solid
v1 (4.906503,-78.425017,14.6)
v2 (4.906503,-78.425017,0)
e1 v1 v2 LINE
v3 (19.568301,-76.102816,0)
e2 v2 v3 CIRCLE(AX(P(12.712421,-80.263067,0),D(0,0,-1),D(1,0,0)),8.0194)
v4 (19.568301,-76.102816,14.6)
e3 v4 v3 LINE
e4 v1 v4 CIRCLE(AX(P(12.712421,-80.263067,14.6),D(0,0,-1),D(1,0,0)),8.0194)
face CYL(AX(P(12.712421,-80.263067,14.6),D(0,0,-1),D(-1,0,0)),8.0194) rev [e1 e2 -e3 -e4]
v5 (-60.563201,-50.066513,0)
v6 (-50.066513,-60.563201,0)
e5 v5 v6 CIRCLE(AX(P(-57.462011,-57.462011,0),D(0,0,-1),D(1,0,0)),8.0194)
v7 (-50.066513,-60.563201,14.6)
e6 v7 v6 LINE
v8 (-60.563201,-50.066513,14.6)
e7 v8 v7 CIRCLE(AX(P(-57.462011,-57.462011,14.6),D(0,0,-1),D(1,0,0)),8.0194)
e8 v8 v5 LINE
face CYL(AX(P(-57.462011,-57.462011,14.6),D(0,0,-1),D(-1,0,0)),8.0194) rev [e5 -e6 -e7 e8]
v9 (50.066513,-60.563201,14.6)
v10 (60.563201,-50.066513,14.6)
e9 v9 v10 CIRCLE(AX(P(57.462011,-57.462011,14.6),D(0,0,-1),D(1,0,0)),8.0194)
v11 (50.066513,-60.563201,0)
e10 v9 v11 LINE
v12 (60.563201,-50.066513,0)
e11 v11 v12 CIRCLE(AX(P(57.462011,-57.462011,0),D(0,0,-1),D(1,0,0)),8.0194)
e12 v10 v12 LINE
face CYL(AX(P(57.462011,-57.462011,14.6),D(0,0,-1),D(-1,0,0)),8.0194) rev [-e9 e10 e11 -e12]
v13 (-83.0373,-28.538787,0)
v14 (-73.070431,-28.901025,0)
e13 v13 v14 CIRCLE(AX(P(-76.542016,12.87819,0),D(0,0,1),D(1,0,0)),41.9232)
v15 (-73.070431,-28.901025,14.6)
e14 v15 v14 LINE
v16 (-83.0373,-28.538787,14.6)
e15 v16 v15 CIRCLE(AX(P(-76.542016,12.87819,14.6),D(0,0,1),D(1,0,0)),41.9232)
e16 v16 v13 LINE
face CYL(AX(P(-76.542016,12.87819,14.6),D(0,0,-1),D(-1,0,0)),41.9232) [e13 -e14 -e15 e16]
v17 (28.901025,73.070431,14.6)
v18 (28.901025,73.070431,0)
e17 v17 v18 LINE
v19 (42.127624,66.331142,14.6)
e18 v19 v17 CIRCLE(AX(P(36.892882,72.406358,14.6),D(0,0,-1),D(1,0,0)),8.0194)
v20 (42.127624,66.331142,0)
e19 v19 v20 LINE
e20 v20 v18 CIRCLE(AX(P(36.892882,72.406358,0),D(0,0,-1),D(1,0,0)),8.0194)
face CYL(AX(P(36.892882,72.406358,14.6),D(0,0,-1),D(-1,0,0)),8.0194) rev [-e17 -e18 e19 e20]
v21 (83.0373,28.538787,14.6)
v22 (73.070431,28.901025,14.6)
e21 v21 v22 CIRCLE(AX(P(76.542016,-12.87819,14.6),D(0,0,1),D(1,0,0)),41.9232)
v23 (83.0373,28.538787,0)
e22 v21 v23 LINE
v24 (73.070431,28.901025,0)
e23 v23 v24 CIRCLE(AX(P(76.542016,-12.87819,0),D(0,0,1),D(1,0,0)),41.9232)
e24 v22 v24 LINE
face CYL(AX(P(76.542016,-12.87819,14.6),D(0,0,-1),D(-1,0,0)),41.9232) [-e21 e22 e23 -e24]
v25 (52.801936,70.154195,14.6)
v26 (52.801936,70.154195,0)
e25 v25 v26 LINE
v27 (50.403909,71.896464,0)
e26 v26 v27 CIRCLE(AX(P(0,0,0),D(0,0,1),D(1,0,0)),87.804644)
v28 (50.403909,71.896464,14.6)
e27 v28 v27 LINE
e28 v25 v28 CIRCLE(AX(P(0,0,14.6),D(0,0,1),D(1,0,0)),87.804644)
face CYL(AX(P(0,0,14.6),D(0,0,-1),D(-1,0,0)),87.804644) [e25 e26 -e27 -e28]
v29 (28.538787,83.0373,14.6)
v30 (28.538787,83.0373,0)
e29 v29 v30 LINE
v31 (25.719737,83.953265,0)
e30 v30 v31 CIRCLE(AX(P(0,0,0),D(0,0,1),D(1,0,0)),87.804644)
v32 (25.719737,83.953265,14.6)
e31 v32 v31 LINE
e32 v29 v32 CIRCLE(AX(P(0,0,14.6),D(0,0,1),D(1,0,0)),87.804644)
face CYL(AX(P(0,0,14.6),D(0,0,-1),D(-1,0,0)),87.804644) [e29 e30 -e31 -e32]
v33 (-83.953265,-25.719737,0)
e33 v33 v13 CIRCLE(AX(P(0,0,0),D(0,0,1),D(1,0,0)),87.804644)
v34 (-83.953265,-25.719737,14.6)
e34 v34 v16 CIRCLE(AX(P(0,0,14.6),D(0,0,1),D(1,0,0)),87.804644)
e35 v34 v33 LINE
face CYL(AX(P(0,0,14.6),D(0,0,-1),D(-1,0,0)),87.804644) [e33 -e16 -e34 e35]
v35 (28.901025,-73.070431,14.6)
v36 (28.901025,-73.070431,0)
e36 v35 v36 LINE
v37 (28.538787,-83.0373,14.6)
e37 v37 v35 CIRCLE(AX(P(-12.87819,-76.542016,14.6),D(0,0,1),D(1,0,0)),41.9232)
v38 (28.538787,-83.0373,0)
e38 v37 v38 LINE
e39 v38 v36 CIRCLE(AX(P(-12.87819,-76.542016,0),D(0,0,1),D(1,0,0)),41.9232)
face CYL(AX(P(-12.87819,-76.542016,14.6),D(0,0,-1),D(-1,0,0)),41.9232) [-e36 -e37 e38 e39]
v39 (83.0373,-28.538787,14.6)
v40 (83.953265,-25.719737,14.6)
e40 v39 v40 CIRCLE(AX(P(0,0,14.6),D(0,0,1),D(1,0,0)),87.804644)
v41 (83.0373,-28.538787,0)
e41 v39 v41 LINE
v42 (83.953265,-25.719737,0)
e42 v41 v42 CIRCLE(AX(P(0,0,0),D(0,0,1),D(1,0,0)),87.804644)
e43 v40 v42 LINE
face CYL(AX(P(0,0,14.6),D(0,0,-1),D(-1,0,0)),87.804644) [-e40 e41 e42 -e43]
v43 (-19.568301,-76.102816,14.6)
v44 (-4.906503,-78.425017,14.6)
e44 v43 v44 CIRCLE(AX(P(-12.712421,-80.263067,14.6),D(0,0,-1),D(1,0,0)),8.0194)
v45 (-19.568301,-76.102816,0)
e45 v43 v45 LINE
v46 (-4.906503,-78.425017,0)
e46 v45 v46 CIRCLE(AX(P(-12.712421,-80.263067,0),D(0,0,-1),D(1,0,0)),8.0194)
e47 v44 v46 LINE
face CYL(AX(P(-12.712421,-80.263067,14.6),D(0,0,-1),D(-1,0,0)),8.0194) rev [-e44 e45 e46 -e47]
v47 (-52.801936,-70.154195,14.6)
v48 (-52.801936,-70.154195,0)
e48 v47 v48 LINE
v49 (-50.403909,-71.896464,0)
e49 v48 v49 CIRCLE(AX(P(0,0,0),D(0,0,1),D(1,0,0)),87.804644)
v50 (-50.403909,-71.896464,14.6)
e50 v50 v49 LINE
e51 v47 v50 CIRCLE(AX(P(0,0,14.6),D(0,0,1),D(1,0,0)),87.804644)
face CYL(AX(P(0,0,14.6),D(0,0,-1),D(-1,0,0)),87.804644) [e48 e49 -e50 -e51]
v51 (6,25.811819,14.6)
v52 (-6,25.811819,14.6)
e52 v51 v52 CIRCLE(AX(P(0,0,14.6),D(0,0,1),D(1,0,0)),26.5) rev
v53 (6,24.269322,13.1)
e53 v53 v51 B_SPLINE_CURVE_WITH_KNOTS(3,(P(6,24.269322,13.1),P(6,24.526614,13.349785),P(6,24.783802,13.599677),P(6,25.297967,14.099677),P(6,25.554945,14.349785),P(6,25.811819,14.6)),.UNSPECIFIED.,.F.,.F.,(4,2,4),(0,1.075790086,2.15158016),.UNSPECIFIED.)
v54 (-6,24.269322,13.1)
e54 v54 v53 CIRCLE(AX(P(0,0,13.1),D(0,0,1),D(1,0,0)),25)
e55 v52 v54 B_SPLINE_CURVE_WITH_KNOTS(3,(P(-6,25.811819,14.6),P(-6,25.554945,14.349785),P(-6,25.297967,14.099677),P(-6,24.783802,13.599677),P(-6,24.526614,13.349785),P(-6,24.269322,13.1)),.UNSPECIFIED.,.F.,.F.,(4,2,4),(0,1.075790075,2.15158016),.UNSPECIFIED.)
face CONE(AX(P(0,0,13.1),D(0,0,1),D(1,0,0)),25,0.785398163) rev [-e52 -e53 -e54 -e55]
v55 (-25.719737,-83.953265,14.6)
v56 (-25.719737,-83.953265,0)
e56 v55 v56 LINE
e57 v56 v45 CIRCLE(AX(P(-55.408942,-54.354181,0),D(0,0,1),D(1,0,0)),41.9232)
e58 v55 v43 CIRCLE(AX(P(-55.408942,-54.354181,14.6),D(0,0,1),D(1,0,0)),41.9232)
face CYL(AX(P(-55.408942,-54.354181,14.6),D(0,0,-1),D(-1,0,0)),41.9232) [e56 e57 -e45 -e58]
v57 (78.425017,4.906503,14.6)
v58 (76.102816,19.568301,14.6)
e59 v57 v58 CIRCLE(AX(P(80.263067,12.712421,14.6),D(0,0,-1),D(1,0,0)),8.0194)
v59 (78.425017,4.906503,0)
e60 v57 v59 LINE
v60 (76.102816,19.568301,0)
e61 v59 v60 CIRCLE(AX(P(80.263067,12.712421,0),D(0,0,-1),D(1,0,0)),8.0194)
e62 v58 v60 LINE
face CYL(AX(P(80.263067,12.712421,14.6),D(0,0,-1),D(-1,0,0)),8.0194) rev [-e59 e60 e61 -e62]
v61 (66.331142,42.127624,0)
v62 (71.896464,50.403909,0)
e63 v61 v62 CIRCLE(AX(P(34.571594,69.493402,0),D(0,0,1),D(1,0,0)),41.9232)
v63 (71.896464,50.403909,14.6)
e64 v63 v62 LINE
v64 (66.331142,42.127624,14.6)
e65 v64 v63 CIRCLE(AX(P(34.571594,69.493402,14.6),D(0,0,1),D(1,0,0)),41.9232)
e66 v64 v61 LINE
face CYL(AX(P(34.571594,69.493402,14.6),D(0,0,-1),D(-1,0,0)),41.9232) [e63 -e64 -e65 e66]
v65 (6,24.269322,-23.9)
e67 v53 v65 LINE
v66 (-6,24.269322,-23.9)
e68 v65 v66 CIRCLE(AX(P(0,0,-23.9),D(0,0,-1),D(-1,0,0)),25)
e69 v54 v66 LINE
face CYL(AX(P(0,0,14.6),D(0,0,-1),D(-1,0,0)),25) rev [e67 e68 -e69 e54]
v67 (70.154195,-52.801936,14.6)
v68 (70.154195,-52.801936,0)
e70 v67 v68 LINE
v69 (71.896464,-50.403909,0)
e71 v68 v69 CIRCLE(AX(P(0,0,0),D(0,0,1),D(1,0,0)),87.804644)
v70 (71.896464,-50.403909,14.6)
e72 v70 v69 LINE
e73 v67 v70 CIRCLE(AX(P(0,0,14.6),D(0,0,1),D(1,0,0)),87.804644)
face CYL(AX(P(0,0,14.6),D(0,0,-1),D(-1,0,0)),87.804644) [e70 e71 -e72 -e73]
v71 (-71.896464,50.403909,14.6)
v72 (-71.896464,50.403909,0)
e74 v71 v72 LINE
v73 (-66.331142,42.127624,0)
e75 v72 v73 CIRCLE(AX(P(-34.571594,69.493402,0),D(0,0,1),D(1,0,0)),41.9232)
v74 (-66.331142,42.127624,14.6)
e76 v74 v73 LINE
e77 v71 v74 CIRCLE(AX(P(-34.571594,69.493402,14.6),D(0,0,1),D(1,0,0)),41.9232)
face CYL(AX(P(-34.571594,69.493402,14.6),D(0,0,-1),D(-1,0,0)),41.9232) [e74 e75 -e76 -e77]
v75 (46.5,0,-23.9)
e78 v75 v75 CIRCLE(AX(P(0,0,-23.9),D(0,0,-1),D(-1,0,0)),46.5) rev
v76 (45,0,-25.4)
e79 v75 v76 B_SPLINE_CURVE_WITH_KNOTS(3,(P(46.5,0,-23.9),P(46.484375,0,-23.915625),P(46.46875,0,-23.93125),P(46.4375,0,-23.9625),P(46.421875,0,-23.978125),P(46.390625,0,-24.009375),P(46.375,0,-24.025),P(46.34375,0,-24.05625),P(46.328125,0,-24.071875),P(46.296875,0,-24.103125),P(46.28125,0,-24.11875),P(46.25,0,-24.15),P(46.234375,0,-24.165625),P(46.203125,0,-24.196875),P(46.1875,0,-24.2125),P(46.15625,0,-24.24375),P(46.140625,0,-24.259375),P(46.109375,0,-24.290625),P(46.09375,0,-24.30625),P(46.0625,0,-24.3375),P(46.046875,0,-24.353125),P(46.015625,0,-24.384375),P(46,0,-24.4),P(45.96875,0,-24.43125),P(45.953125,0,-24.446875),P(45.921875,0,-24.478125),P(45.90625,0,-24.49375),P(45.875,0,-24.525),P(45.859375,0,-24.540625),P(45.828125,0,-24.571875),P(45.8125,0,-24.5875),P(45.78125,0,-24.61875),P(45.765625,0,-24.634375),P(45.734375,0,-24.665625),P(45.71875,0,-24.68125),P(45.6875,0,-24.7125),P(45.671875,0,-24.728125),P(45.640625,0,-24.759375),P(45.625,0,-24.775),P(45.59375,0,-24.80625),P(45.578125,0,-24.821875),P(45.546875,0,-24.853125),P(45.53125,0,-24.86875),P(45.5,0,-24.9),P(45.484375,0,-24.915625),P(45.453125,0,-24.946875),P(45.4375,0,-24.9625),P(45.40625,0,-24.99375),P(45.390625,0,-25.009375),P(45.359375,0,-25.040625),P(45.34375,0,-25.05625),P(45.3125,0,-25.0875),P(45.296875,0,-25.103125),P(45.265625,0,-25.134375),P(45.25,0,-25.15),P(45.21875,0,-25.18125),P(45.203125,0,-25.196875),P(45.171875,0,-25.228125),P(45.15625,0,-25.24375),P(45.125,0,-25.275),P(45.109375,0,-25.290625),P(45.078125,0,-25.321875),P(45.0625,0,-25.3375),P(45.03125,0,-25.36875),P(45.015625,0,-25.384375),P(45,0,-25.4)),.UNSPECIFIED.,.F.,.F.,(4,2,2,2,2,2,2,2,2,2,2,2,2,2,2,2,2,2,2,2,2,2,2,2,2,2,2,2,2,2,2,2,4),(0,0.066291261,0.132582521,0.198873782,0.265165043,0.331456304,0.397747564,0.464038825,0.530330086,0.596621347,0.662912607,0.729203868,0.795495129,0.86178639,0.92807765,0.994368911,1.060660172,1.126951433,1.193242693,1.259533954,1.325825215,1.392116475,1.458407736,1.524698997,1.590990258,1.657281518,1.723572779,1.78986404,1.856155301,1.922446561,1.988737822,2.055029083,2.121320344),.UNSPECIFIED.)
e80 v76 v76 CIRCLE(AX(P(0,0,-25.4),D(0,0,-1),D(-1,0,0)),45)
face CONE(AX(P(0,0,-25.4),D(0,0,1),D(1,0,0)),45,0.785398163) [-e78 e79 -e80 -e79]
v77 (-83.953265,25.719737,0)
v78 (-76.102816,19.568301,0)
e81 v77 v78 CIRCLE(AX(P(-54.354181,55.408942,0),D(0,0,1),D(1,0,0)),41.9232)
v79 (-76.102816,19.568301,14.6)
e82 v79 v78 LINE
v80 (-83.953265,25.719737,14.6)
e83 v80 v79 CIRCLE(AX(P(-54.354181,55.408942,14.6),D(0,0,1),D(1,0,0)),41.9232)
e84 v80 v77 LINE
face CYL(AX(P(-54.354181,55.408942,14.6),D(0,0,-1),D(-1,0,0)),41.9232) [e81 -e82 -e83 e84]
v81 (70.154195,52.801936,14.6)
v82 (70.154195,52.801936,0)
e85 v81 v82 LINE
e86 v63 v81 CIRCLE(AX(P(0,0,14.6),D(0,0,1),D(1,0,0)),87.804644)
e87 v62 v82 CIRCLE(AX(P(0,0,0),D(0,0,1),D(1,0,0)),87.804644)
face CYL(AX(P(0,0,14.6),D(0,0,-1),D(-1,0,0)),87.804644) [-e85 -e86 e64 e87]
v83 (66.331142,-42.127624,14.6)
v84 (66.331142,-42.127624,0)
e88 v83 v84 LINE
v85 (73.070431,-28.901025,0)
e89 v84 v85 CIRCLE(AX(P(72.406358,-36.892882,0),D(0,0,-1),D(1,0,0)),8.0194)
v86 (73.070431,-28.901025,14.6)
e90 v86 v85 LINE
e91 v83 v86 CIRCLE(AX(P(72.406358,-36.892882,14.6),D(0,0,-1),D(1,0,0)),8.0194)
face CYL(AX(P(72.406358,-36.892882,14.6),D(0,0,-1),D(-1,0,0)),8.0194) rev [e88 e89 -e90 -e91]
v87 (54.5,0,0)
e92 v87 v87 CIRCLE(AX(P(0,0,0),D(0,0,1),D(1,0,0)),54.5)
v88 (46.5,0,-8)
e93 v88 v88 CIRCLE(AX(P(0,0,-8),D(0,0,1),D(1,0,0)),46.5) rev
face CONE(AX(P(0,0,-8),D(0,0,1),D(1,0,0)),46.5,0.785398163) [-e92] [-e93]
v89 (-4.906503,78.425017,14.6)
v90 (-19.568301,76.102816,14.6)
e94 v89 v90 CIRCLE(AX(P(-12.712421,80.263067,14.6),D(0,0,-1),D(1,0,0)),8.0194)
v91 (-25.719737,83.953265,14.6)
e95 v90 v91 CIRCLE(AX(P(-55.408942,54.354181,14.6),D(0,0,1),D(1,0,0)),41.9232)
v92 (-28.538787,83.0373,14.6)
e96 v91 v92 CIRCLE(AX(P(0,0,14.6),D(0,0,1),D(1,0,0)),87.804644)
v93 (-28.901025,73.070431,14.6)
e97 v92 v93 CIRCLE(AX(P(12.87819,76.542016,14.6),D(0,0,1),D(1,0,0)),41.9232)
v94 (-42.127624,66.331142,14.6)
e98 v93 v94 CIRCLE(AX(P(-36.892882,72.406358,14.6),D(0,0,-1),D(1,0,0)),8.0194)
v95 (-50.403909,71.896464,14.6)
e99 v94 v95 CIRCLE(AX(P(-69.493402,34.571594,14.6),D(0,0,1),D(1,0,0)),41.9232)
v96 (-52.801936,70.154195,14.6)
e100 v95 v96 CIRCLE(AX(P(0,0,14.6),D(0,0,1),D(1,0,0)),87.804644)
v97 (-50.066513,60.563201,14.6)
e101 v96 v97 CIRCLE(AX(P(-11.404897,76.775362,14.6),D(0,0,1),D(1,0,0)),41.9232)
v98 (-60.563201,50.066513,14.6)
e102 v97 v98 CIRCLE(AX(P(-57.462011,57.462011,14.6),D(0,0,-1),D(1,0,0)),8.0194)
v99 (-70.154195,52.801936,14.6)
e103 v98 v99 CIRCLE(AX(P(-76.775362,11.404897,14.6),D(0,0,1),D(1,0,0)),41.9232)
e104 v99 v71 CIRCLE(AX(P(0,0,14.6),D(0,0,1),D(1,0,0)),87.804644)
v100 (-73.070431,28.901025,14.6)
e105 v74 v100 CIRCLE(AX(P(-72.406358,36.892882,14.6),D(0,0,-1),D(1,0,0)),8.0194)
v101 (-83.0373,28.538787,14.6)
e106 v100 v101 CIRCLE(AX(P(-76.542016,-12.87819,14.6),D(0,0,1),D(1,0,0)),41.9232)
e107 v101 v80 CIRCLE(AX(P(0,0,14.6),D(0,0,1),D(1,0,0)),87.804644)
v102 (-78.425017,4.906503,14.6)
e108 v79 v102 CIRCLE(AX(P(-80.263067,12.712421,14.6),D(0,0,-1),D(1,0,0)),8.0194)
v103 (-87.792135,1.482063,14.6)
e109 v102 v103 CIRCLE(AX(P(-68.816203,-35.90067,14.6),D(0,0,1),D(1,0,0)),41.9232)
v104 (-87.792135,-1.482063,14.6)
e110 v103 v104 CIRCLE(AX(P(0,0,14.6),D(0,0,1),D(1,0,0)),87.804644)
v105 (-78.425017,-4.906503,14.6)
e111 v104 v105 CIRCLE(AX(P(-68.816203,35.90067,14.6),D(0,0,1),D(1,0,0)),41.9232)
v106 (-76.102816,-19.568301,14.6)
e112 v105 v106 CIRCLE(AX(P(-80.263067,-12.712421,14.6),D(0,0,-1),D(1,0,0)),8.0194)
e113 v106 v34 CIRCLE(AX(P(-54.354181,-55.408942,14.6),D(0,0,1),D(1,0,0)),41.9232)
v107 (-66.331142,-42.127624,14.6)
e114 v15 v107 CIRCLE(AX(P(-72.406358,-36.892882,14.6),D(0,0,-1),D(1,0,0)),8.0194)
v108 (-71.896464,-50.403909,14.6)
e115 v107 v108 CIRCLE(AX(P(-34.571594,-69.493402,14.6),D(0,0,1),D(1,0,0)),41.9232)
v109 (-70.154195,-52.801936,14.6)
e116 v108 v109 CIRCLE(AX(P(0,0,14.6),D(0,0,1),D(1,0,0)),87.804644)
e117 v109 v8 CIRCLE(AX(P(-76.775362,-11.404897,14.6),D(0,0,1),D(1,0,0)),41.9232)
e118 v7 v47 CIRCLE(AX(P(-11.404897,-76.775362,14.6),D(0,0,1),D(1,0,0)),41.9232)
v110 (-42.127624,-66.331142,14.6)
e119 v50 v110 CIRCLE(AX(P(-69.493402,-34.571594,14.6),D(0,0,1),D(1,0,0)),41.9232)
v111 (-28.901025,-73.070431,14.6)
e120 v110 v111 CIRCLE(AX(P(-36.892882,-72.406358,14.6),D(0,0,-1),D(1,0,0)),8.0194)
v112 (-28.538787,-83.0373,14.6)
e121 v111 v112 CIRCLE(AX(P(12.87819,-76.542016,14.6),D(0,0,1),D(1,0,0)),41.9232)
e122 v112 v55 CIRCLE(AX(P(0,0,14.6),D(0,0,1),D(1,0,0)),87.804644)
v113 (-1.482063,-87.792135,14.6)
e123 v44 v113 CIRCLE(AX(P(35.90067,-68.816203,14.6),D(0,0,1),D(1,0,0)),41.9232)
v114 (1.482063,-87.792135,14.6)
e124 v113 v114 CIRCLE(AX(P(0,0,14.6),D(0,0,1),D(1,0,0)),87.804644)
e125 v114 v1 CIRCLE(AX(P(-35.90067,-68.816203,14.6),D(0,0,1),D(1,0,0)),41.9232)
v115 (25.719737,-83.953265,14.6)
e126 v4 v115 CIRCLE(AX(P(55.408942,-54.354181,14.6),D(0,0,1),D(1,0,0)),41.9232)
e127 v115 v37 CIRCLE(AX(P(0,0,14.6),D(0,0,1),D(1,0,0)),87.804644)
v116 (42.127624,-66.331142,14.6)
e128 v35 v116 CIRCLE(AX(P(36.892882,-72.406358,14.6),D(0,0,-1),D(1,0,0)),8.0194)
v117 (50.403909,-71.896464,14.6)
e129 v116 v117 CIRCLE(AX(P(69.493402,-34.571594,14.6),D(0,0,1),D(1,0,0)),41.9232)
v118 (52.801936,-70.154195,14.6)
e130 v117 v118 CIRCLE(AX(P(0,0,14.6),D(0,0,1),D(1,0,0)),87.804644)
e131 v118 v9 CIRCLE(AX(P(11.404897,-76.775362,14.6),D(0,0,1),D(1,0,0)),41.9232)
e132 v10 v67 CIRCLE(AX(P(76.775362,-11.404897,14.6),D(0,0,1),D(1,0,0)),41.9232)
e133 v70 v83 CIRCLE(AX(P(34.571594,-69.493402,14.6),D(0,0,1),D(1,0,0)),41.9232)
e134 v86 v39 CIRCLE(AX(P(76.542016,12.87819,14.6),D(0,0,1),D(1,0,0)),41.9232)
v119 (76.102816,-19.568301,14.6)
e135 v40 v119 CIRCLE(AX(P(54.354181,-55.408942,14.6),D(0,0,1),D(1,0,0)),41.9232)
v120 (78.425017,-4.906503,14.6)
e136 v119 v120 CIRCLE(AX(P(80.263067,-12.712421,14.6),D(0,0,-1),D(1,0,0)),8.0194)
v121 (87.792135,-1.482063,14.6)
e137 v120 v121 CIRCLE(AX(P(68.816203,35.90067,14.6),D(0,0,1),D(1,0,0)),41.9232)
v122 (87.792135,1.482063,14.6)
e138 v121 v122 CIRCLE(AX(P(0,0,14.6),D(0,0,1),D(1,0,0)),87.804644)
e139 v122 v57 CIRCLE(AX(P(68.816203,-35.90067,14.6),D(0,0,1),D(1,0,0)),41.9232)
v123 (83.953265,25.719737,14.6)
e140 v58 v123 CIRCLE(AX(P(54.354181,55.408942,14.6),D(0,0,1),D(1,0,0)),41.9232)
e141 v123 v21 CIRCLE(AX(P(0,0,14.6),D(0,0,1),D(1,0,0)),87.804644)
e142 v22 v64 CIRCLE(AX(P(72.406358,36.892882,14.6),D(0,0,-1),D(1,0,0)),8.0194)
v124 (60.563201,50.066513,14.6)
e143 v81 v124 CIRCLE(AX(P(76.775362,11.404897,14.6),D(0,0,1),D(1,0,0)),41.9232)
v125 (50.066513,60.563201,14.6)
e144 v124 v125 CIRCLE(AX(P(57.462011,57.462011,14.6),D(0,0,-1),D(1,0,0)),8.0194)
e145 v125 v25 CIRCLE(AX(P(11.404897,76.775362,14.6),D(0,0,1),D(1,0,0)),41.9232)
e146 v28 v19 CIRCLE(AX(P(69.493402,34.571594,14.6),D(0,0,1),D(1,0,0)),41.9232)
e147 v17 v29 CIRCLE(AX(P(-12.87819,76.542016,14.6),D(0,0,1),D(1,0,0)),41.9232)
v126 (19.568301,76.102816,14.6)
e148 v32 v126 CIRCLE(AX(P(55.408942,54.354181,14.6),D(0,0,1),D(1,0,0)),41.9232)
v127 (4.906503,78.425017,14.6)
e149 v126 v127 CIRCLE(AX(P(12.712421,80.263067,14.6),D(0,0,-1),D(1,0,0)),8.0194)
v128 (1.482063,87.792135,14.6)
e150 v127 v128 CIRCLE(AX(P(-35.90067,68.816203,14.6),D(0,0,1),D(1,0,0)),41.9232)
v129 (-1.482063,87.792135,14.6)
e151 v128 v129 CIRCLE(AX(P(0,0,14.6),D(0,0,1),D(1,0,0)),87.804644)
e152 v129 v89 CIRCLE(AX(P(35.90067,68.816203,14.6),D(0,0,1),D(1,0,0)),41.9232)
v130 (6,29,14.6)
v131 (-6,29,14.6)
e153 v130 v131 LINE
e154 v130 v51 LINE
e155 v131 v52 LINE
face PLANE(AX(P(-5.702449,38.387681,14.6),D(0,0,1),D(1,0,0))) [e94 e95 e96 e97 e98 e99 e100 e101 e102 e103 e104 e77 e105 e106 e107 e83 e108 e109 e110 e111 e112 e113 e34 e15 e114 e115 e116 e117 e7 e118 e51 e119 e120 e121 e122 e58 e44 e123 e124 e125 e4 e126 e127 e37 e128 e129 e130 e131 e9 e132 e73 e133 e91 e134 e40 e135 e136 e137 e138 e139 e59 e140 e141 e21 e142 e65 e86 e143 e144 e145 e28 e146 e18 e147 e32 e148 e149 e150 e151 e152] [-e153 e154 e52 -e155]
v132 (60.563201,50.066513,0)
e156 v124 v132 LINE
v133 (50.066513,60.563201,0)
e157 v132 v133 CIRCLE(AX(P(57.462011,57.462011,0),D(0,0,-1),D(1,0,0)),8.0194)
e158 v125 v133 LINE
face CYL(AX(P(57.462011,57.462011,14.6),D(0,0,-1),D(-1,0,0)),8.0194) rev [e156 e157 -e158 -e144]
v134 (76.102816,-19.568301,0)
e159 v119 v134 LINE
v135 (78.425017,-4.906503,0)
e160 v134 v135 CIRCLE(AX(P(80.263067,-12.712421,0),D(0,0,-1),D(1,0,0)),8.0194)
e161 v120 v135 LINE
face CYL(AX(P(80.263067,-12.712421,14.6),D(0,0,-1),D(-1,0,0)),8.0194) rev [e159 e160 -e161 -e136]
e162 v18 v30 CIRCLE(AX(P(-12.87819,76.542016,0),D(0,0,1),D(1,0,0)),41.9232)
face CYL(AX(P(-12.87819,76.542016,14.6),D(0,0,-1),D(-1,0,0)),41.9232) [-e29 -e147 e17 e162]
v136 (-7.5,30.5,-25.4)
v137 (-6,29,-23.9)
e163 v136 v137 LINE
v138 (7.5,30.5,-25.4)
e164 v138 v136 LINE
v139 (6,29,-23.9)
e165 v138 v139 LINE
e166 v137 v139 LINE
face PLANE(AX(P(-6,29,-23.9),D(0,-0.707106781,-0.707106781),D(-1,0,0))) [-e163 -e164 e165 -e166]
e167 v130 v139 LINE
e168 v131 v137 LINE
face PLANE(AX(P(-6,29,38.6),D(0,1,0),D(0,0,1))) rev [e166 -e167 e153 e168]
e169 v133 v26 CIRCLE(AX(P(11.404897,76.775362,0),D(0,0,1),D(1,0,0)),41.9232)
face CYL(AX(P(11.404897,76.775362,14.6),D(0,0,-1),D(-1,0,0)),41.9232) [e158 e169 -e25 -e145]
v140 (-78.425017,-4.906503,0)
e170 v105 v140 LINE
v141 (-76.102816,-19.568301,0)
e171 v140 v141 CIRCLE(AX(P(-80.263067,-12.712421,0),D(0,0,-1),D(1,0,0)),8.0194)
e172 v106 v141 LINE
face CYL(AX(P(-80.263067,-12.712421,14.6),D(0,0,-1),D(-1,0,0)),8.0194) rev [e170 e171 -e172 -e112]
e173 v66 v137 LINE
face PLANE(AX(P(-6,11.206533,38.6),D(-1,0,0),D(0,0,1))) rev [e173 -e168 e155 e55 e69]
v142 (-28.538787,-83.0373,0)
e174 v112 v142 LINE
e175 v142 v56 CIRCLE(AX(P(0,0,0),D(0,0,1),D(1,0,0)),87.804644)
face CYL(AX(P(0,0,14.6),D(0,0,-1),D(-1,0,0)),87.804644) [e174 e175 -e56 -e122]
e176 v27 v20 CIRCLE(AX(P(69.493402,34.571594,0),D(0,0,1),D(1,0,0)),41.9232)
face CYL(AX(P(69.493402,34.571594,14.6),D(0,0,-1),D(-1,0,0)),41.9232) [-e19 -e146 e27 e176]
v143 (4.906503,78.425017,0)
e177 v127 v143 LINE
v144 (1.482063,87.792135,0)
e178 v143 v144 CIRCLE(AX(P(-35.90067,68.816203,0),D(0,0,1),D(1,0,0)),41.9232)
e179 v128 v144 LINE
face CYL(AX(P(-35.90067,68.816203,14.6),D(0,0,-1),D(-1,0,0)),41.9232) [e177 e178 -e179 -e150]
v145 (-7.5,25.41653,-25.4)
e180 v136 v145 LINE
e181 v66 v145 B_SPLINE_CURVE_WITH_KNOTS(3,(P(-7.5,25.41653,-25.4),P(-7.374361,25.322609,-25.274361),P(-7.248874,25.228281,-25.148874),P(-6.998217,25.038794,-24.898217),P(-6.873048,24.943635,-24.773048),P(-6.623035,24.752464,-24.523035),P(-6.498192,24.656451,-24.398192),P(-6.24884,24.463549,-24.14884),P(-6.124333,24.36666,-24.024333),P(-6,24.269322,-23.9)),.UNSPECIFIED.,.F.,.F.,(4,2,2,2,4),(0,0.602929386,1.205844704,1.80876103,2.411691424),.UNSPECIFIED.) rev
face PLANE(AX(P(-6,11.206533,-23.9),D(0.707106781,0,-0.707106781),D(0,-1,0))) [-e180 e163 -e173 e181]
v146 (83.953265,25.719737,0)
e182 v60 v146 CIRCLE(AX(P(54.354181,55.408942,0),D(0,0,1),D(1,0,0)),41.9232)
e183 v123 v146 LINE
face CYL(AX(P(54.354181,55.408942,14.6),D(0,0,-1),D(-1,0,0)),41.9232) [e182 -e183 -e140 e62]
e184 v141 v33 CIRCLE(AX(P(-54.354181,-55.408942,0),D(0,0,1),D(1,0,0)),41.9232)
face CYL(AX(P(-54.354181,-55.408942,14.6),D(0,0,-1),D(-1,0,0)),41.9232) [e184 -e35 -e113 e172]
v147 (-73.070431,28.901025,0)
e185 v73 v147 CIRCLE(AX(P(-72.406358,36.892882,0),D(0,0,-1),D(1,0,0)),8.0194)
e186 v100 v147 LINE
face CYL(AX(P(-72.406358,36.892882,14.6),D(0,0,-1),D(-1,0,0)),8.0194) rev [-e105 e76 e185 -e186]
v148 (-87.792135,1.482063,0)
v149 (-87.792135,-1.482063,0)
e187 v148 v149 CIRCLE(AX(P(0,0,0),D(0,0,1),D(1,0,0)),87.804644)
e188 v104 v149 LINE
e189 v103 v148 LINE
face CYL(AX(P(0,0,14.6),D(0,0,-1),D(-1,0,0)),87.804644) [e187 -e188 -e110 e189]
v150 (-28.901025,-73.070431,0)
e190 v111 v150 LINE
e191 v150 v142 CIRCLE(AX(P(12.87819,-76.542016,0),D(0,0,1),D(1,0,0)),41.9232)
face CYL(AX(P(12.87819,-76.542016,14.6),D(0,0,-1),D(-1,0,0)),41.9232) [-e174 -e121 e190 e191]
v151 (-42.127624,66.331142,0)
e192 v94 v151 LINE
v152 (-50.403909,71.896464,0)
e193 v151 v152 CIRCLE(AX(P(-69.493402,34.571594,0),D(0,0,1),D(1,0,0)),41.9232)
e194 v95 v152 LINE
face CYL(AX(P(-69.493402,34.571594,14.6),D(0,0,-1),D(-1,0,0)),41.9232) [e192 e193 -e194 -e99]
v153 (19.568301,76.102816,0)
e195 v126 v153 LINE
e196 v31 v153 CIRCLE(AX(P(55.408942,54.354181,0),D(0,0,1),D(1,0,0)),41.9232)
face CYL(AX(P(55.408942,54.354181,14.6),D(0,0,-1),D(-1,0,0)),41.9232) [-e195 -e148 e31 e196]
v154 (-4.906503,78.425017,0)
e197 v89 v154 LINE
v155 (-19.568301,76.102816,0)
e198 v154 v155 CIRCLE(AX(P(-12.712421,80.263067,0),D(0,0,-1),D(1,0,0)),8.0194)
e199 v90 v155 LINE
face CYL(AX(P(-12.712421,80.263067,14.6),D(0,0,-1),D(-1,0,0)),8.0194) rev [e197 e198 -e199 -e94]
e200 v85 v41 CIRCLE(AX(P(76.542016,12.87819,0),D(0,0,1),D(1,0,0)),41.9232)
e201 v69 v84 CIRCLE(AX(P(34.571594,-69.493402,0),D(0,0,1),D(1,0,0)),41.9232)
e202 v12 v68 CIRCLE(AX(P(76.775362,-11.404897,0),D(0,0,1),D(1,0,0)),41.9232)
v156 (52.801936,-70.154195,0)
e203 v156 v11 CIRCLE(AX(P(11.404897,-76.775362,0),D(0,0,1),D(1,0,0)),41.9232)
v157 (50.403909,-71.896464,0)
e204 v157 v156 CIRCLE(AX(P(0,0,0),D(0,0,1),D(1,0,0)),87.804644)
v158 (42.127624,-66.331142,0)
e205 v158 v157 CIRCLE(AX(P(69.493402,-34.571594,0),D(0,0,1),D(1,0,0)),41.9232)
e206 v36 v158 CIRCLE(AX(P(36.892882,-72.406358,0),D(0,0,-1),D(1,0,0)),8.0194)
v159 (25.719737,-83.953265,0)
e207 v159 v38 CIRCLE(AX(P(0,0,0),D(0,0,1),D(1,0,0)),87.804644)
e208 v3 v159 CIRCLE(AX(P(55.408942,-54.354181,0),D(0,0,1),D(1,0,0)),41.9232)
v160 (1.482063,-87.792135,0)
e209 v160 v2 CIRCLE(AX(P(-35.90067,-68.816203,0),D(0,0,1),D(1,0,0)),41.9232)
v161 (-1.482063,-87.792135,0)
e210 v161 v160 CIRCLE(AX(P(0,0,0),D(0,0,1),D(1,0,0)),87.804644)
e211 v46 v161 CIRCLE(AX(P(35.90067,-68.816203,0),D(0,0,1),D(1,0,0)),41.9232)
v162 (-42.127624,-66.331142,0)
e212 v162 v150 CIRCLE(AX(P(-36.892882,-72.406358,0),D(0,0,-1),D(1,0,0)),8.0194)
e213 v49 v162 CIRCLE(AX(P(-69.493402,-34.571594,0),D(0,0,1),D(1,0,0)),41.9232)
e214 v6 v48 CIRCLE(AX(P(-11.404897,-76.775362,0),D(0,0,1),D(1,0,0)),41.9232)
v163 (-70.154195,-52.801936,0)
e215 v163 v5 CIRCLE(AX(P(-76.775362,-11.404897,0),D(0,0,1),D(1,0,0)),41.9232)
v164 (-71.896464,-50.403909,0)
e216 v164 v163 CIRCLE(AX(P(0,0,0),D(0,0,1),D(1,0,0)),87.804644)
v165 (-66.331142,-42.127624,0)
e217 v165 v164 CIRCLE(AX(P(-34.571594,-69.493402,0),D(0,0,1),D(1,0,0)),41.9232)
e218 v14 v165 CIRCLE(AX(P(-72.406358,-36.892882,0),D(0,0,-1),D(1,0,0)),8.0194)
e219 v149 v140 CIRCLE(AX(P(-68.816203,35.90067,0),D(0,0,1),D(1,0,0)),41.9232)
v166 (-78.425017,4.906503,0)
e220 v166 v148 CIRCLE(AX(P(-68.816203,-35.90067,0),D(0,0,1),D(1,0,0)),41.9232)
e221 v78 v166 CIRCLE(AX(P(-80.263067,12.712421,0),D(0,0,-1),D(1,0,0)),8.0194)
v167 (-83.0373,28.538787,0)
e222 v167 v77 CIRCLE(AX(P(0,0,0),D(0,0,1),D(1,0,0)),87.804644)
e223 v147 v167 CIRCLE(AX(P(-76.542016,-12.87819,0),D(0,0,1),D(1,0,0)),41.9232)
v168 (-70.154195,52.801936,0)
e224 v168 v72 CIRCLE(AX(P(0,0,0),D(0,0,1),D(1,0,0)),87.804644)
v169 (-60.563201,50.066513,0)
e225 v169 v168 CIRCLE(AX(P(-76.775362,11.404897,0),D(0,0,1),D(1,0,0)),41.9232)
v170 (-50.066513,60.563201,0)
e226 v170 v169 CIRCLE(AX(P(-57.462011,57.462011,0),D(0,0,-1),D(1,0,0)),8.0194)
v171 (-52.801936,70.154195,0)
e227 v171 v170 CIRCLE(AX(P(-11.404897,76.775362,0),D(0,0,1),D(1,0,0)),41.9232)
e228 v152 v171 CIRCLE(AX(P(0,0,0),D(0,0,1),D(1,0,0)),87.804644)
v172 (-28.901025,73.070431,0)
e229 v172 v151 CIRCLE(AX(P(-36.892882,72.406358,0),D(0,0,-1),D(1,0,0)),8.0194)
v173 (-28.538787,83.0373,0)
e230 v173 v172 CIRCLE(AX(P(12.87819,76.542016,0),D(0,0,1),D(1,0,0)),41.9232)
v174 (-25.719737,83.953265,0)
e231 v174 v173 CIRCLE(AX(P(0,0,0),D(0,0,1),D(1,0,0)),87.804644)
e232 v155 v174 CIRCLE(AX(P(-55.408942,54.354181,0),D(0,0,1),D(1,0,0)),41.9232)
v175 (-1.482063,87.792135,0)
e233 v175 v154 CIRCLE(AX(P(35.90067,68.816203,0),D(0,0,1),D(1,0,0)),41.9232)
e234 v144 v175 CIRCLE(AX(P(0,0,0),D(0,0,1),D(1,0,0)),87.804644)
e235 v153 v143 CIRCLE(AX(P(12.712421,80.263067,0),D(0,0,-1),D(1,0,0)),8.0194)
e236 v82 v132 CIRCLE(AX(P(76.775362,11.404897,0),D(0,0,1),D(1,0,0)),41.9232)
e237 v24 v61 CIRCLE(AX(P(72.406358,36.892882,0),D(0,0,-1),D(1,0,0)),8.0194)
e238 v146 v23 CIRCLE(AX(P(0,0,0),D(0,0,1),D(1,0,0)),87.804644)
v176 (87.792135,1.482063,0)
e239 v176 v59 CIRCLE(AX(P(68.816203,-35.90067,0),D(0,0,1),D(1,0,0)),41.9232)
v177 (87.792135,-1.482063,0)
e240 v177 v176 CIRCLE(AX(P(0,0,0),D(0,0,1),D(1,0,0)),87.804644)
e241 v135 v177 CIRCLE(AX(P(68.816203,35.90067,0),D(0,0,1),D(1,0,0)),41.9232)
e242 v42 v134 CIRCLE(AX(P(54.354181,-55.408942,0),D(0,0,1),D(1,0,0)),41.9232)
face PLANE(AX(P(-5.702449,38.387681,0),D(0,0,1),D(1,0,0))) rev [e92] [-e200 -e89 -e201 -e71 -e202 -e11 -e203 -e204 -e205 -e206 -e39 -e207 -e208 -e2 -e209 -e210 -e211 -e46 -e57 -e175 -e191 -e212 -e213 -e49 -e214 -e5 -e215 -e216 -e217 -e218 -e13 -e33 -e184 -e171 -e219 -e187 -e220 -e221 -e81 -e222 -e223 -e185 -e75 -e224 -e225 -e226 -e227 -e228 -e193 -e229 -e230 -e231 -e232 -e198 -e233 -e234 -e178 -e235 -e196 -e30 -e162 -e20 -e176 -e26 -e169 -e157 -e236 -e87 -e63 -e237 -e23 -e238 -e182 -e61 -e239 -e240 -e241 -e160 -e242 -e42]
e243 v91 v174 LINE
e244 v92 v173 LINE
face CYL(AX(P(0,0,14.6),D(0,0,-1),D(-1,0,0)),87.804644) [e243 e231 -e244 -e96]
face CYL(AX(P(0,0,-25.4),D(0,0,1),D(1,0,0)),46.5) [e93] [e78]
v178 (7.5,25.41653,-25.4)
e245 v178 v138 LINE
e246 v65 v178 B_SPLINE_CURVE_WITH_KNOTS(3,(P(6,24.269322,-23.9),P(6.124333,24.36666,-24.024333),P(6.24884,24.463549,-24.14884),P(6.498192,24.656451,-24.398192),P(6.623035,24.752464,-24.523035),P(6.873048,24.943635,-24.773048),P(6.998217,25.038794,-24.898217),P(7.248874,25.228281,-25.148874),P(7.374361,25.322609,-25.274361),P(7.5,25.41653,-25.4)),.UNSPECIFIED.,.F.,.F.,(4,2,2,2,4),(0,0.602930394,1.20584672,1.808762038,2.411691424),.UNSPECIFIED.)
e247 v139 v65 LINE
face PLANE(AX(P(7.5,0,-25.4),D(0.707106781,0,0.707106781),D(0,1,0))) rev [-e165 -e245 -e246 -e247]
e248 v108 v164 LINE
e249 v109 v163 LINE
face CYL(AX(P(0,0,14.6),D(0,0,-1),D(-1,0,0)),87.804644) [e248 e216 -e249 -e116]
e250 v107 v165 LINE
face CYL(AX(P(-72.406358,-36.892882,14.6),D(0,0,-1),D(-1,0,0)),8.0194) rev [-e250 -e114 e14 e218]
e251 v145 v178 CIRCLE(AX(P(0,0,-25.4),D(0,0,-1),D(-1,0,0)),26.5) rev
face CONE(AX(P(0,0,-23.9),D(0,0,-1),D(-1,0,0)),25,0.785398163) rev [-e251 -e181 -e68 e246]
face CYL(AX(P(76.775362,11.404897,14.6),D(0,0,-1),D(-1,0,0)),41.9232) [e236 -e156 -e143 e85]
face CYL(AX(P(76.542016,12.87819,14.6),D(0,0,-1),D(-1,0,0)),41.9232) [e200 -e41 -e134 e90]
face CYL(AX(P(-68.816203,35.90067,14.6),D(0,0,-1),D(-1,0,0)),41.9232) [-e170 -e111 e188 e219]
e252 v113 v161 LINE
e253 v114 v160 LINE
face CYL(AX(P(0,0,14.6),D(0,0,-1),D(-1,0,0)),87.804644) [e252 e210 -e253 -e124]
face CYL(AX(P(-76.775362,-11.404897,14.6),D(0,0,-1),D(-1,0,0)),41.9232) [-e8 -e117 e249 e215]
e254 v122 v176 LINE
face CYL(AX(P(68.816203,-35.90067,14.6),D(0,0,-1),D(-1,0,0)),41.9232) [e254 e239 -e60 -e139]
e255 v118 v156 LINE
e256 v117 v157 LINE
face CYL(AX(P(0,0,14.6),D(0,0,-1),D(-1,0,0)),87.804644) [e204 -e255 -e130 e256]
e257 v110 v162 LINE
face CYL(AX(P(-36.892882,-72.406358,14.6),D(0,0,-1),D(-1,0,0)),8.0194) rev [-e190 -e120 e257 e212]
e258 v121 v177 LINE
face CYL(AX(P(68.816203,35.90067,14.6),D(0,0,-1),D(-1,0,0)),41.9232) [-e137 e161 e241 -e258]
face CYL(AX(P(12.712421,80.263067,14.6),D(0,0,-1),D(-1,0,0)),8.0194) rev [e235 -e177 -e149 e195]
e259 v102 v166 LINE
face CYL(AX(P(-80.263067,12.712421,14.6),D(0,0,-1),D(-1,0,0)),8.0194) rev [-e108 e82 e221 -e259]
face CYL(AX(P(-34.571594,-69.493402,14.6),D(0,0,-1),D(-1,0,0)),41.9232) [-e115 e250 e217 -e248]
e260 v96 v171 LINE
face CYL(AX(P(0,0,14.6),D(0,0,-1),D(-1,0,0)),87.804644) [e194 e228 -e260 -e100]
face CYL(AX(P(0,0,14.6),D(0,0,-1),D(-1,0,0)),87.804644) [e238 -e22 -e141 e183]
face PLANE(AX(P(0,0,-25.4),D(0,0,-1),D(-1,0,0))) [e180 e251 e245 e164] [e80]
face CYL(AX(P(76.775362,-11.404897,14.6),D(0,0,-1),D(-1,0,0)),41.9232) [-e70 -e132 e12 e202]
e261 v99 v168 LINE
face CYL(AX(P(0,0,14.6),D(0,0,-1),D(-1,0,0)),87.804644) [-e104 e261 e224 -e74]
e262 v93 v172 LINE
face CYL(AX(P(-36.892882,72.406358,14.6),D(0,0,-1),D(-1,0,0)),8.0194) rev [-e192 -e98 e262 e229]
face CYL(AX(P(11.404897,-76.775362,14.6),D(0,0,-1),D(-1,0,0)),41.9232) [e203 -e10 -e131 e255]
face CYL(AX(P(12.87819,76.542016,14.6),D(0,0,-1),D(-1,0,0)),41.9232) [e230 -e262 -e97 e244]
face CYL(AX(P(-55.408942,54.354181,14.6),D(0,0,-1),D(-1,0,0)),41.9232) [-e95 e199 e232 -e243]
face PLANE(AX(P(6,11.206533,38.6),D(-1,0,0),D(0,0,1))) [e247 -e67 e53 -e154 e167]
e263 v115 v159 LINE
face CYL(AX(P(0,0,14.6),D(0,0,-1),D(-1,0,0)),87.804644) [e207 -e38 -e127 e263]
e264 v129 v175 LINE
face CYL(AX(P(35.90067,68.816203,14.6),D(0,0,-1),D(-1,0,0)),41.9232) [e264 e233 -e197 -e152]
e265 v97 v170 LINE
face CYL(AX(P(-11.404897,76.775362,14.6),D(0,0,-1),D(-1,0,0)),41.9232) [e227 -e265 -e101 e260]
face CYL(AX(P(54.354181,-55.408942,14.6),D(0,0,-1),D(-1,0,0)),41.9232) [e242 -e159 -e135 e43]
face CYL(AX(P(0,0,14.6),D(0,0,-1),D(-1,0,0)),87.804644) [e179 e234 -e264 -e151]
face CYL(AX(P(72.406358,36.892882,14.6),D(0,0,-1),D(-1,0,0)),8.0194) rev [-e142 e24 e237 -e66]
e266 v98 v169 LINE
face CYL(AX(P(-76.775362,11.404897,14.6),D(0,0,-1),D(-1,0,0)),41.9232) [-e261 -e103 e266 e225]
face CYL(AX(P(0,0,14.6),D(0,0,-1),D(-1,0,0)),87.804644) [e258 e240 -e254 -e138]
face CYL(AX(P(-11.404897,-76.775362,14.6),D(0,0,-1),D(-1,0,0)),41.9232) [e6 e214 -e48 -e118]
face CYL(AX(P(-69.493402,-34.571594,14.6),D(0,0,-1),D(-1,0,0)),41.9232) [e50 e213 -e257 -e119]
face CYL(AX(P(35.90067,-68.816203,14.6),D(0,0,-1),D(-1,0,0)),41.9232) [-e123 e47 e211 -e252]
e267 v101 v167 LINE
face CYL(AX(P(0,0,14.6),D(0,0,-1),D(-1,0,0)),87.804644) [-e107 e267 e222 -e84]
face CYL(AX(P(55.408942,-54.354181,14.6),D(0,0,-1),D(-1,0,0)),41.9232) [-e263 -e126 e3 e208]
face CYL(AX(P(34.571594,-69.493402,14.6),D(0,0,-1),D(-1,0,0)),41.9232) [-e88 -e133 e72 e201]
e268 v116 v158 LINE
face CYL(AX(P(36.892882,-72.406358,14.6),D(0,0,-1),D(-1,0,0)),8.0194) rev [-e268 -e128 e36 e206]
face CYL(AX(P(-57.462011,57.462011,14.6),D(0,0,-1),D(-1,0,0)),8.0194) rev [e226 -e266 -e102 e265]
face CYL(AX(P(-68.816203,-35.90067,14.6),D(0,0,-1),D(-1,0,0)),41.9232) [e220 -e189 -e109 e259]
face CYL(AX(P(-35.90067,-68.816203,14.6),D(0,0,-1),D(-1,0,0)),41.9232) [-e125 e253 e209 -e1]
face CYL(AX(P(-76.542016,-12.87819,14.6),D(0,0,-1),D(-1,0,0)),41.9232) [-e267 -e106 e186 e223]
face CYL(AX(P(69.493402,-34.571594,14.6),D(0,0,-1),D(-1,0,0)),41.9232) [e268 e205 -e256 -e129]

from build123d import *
from build123d.topology import SkipClean

# Parameters (mm, degrees)
SKETCH2_R           = 25
BOSS_EXTRUDE1_DEPTH = 14.6
BOSS_EXTRUDE2_START = 40
SKETCH3_R           = 46.5
SKETCH3_R_2         = 25
BOSS_EXTRUDE2_DEPTH = 40
SKETCH6_W           = 12
SKETCH6_H           = 17.793467461
CUT_EXTRUDE1_DEPTH  = 64
CHAMFER1_SIZE       = 1.5
CHAMFER2_SIZE       = 8


with BuildPart() as part:
    # Sketch2 → Boss-Extrude1 (new body)
    with BuildSketch(Plane.XY):
        with BuildLine():
            ThreePointArc((-52.801936247, 70.154195014), (-51.720450563, 65.277064388), (-50.066512977, 60.563201335))
            ThreePointArc((-50.066512977, 60.563201335), (-51.791439328, 51.791439328), (-60.563201335, 50.066512977))
            ThreePointArc((-60.563201335, 50.066512977), (-65.277064388, 51.720450563), (-70.154195014, 52.801936247))
            ThreePointArc((-70.154195014, 52.801936247), (-71.035449372, 51.610274965), (-71.896464027, 50.403908677))
            ThreePointArc((-71.896464027, 50.403908677), (-69.360793773, 46.09967927), (-66.331141862, 42.127623919))
            ThreePointArc((-66.331141862, 42.127623919), (-65.261020777, 33.252150946), (-73.070430637, 28.901024969))
            ThreePointArc((-73.070430637, 28.901024969), (-78.064675632, 29.017349295), (-83.03729995, 28.538787055))
            ThreePointArc((-83.03729995, 28.538787055), (-83.507179062, 27.133127254), (-83.953264975, 25.719736574))
            ThreePointArc((-83.953264975, 25.719736574), (-80.211619223, 22.40973635), (-76.102816424, 19.568301152))
            ThreePointArc((-76.102816424, 19.568301152), (-72.342398812, 11.457910348), (-78.425017076, 4.906503271))
            ThreePointArc((-78.425017076, 4.906503271), (-83.210772516, 3.473827702), (-87.792135411, 1.482062544))
            ThreePointArc((-87.792135411, 1.482062544), (-87.804644236, 0), (-87.792135411, -1.482062544))
            ThreePointArc((-87.792135411, -1.482062544), (-83.210772516, -3.473827702), (-78.425017076, -4.906503271))
            ThreePointArc((-78.425017076, -4.906503271), (-72.342398812, -11.457910348), (-76.102816424, -19.568301152))
            ThreePointArc((-76.102816424, -19.568301152), (-80.211619223, -22.40973635), (-83.953264975, -25.719736574))
            ThreePointArc((-83.953264975, -25.719736574), (-83.507179062, -27.133127254), (-83.03729995, -28.538787055))
            ThreePointArc((-83.03729995, -28.538787055), (-78.064675632, -29.017349295), (-73.070430637, -28.901024969))
            ThreePointArc((-73.070430637, -28.901024969), (-65.261020777, -33.252150946), (-66.331141862, -42.127623918))
            ThreePointArc((-66.331141862, -42.127623918), (-69.360793773, -46.09967927), (-71.896464027, -50.403908677))
            ThreePointArc((-71.896464027, -50.403908677), (-71.035449372, -51.610274965), (-70.154195014, -52.801936247))
            ThreePointArc((-70.154195014, -52.801936247), (-65.277064388, -51.720450563), (-60.563201335, -50.066512977))
            ThreePointArc((-60.563201335, -50.066512977), (-51.791439328, -51.791439328), (-50.066512977, -60.563201335))
            ThreePointArc((-50.066512977, -60.563201335), (-51.720450563, -65.277064388), (-52.801936247, -70.154195014))
            ThreePointArc((-52.801936247, -70.154195014), (-51.610274965, -71.035449372), (-50.403908677, -71.896464027))
            ThreePointArc((-50.403908677, -71.896464027), (-46.09967927, -69.360793773), (-42.127623918, -66.331141861))
            ThreePointArc((-42.127623918, -66.331141861), (-33.252150946, -65.261020777), (-28.901024969, -73.070430637))
            ThreePointArc((-28.901024969, -73.070430637), (-29.017349295, -78.064675632), (-28.538787055, -83.03729995))
            ThreePointArc((-28.538787055, -83.03729995), (-27.133127254, -83.507179062), (-25.719736574, -83.953264975))
            ThreePointArc((-25.719736574, -83.953264975), (-22.40973635, -80.211619223), (-19.568301152, -76.102816424))
            ThreePointArc((-19.568301152, -76.102816424), (-11.457910348, -72.342398812), (-4.906503271, -78.425017076))
            ThreePointArc((-4.906503271, -78.425017076), (-3.473827702, -83.210772516), (-1.482062544, -87.792135411))
            ThreePointArc((-1.482062544, -87.792135411), (0, -87.804644236), (1.482062544, -87.792135411))
            ThreePointArc((1.482062544, -87.792135411), (3.473827702, -83.210772516), (4.906503271, -78.425017076))
            ThreePointArc((4.906503271, -78.425017076), (11.457910348, -72.342398812), (19.568301152, -76.102816424))
            ThreePointArc((19.568301152, -76.102816424), (22.40973635, -80.211619223), (25.719736574, -83.953264975))
            ThreePointArc((25.719736574, -83.953264975), (27.133127254, -83.507179062), (28.538787055, -83.03729995))
            ThreePointArc((28.538787055, -83.03729995), (29.017349295, -78.064675632), (28.901024969, -73.070430637))
            ThreePointArc((28.901024969, -73.070430637), (33.252150946, -65.261020777), (42.127623918, -66.331141861))
            ThreePointArc((42.127623918, -66.331141861), (46.09967927, -69.360793773), (50.403908677, -71.896464027))
            ThreePointArc((50.403908677, -71.896464027), (51.610274965, -71.035449372), (52.801936247, -70.154195014))
            ThreePointArc((52.801936247, -70.154195014), (51.720450563, -65.277064388), (50.066512977, -60.563201335))
            ThreePointArc((50.066512977, -60.563201335), (51.791439328, -51.791439328), (60.563201335, -50.066512977))
            ThreePointArc((60.563201335, -50.066512977), (65.277064388, -51.720450563), (70.154195014, -52.801936247))
            ThreePointArc((70.154195014, -52.801936247), (71.035449372, -51.610274965), (71.896464027, -50.403908677))
            ThreePointArc((71.896464027, -50.403908677), (69.360793773, -46.09967927), (66.331141862, -42.127623919))
            ThreePointArc((66.331141862, -42.127623919), (65.261020777, -33.252150946), (73.070430637, -28.901024969))
            ThreePointArc((73.070430637, -28.901024969), (78.064675632, -29.017349295), (83.03729995, -28.538787055))
            ThreePointArc((83.03729995, -28.538787055), (83.507179062, -27.133127254), (83.953264975, -25.719736574))
            ThreePointArc((83.953264975, -25.719736574), (80.211619223, -22.40973635), (76.102816424, -19.568301152))
            ThreePointArc((76.102816424, -19.568301152), (72.342398812, -11.457910348), (78.425017076, -4.906503271))
            ThreePointArc((78.425017076, -4.906503271), (83.210772516, -3.473827702), (87.792135411, -1.482062544))
            ThreePointArc((87.792135411, -1.482062544), (87.804644236, 0), (87.792135411, 1.482062544))
            ThreePointArc((87.792135411, 1.482062544), (83.210772516, 3.473827702), (78.425017076, 4.906503271))
            ThreePointArc((78.425017076, 4.906503271), (72.342398812, 11.457910348), (76.102816424, 19.568301152))
            ThreePointArc((76.102816424, 19.568301152), (80.211619223, 22.40973635), (83.953264975, 25.719736575))
            ThreePointArc((83.953264975, 25.719736575), (83.507179062, 27.133127254), (83.03729995, 28.538787055))
            ThreePointArc((83.03729995, 28.538787055), (78.064675632, 29.017349295), (73.070430637, 28.901024969))
            ThreePointArc((73.070430637, 28.901024969), (65.261020777, 33.252150946), (66.331141862, 42.127623918))
            ThreePointArc((66.331141862, 42.127623918), (69.360793773, 46.09967927), (71.896464027, 50.403908677))
            ThreePointArc((71.896464027, 50.403908677), (71.035449372, 51.610274965), (70.154195014, 52.801936247))
            ThreePointArc((70.154195014, 52.801936247), (65.277064388, 51.720450563), (60.563201335, 50.066512977))
            ThreePointArc((60.563201335, 50.066512977), (51.791439328, 51.791439328), (50.066512977, 60.563201335))
            ThreePointArc((50.066512977, 60.563201335), (51.720450563, 65.277064388), (52.801936247, 70.154195014))
            ThreePointArc((52.801936247, 70.154195014), (51.610274965, 71.035449372), (50.403908677, 71.896464027))
            ThreePointArc((50.403908677, 71.896464027), (46.09967927, 69.360793773), (42.127623918, 66.331141861))
            ThreePointArc((42.127623918, 66.331141861), (33.252150946, 65.261020777), (28.901024969, 73.070430637))
            ThreePointArc((28.901024969, 73.070430637), (29.017349295, 78.064675632), (28.538787055, 83.03729995))
            ThreePointArc((28.538787055, 83.03729995), (27.133127254, 83.507179062), (25.719736574, 83.953264975))
            ThreePointArc((25.719736574, 83.953264975), (22.40973635, 80.211619223), (19.568301152, 76.102816424))
            ThreePointArc((19.568301152, 76.102816424), (11.457910348, 72.342398812), (4.906503271, 78.425017076))
            ThreePointArc((4.906503271, 78.425017076), (3.473827702, 83.210772516), (1.482062544, 87.792135411))
            ThreePointArc((1.482062544, 87.792135411), (0, 87.804644236), (-1.482062544, 87.792135411))
            ThreePointArc((-1.482062544, 87.792135411), (-3.473827702, 83.210772516), (-4.906503271, 78.425017076))
            ThreePointArc((-4.906503271, 78.425017076), (-11.457910348, 72.342398812), (-19.568301152, 76.102816424))
            ThreePointArc((-19.568301152, 76.102816424), (-22.40973635, 80.211619223), (-25.719736574, 83.953264975))
            ThreePointArc((-25.719736574, 83.953264975), (-27.133127254, 83.507179062), (-28.538787055, 83.03729995))
            ThreePointArc((-28.538787055, 83.03729995), (-29.017349295, 78.064675632), (-28.901024969, 73.070430637))
            ThreePointArc((-28.901024969, 73.070430637), (-33.252150946, 65.261020777), (-42.127623918, 66.331141862))
            ThreePointArc((-42.127623918, 66.331141862), (-46.09967927, 69.360793773), (-50.403908677, 71.896464027))
            ThreePointArc((-50.403908677, 71.896464027), (-51.610274965, 71.035449372), (-52.801936247, 70.154195014))
        make_face()
        Circle(SKETCH2_R, mode=Mode.SUBTRACT)
    extrude(amount=BOSS_EXTRUDE1_DEPTH)

    # Sketch3 → Boss-Extrude2 (add)
    with SkipClean():  # the faces are left unmerged after this step: merging them gives an invalid solid
        with BuildSketch(Plane(origin=(0, 0, 14.6), x_dir=(-1, 0, 0), z_dir=(0, 0, -1)).offset(BOSS_EXTRUDE2_START)):
            Circle(SKETCH3_R)
            Circle(SKETCH3_R_2, mode=Mode.SUBTRACT)
        extrude(amount=-BOSS_EXTRUDE2_DEPTH)

    # Sketch6 → Cut-Extrude1 (cut)
    with SkipClean():  # the faces are left unmerged after this step: merging them gives an invalid solid
        with BuildSketch(Plane(origin=(0, 0, -25.4), x_dir=(-1, 0, 0), z_dir=(0, 0, -1))):
            with Locations((0, 20.10326627)):
                Rectangle(SKETCH6_W, SKETCH6_H)
        extrude(amount=-CUT_EXTRUDE1_DEPTH, mode=Mode.SUBTRACT)
    add(part.part.scale(1), mode=Mode.REPLACE)  # the faces are merged on a copy

    # Chamfer1
    chamfer1_edges = [part.edges().sort_by_distance(p)[0] for p in [
        (15.411035007, -19.685019685, -25.4),
        (46.5, 0, -25.4),
        (-6, 26.6346611, -25.4),
        (0, 29, -25.4),
        (6, 26.6346611, -25.4),
        (-15.411035007, -19.685019685, 14.6),
    ]]
    chamfer(chamfer1_edges, length=CHAMFER1_SIZE)

    # Chamfer2
    chamfer2_edges = [part.edges().sort_by_distance(p)[0] for p in [
        (46.5, 0, 0),
    ]]
    chamfer(chamfer2_edges, length=CHAMFER2_SIZE)


solid = part.part
